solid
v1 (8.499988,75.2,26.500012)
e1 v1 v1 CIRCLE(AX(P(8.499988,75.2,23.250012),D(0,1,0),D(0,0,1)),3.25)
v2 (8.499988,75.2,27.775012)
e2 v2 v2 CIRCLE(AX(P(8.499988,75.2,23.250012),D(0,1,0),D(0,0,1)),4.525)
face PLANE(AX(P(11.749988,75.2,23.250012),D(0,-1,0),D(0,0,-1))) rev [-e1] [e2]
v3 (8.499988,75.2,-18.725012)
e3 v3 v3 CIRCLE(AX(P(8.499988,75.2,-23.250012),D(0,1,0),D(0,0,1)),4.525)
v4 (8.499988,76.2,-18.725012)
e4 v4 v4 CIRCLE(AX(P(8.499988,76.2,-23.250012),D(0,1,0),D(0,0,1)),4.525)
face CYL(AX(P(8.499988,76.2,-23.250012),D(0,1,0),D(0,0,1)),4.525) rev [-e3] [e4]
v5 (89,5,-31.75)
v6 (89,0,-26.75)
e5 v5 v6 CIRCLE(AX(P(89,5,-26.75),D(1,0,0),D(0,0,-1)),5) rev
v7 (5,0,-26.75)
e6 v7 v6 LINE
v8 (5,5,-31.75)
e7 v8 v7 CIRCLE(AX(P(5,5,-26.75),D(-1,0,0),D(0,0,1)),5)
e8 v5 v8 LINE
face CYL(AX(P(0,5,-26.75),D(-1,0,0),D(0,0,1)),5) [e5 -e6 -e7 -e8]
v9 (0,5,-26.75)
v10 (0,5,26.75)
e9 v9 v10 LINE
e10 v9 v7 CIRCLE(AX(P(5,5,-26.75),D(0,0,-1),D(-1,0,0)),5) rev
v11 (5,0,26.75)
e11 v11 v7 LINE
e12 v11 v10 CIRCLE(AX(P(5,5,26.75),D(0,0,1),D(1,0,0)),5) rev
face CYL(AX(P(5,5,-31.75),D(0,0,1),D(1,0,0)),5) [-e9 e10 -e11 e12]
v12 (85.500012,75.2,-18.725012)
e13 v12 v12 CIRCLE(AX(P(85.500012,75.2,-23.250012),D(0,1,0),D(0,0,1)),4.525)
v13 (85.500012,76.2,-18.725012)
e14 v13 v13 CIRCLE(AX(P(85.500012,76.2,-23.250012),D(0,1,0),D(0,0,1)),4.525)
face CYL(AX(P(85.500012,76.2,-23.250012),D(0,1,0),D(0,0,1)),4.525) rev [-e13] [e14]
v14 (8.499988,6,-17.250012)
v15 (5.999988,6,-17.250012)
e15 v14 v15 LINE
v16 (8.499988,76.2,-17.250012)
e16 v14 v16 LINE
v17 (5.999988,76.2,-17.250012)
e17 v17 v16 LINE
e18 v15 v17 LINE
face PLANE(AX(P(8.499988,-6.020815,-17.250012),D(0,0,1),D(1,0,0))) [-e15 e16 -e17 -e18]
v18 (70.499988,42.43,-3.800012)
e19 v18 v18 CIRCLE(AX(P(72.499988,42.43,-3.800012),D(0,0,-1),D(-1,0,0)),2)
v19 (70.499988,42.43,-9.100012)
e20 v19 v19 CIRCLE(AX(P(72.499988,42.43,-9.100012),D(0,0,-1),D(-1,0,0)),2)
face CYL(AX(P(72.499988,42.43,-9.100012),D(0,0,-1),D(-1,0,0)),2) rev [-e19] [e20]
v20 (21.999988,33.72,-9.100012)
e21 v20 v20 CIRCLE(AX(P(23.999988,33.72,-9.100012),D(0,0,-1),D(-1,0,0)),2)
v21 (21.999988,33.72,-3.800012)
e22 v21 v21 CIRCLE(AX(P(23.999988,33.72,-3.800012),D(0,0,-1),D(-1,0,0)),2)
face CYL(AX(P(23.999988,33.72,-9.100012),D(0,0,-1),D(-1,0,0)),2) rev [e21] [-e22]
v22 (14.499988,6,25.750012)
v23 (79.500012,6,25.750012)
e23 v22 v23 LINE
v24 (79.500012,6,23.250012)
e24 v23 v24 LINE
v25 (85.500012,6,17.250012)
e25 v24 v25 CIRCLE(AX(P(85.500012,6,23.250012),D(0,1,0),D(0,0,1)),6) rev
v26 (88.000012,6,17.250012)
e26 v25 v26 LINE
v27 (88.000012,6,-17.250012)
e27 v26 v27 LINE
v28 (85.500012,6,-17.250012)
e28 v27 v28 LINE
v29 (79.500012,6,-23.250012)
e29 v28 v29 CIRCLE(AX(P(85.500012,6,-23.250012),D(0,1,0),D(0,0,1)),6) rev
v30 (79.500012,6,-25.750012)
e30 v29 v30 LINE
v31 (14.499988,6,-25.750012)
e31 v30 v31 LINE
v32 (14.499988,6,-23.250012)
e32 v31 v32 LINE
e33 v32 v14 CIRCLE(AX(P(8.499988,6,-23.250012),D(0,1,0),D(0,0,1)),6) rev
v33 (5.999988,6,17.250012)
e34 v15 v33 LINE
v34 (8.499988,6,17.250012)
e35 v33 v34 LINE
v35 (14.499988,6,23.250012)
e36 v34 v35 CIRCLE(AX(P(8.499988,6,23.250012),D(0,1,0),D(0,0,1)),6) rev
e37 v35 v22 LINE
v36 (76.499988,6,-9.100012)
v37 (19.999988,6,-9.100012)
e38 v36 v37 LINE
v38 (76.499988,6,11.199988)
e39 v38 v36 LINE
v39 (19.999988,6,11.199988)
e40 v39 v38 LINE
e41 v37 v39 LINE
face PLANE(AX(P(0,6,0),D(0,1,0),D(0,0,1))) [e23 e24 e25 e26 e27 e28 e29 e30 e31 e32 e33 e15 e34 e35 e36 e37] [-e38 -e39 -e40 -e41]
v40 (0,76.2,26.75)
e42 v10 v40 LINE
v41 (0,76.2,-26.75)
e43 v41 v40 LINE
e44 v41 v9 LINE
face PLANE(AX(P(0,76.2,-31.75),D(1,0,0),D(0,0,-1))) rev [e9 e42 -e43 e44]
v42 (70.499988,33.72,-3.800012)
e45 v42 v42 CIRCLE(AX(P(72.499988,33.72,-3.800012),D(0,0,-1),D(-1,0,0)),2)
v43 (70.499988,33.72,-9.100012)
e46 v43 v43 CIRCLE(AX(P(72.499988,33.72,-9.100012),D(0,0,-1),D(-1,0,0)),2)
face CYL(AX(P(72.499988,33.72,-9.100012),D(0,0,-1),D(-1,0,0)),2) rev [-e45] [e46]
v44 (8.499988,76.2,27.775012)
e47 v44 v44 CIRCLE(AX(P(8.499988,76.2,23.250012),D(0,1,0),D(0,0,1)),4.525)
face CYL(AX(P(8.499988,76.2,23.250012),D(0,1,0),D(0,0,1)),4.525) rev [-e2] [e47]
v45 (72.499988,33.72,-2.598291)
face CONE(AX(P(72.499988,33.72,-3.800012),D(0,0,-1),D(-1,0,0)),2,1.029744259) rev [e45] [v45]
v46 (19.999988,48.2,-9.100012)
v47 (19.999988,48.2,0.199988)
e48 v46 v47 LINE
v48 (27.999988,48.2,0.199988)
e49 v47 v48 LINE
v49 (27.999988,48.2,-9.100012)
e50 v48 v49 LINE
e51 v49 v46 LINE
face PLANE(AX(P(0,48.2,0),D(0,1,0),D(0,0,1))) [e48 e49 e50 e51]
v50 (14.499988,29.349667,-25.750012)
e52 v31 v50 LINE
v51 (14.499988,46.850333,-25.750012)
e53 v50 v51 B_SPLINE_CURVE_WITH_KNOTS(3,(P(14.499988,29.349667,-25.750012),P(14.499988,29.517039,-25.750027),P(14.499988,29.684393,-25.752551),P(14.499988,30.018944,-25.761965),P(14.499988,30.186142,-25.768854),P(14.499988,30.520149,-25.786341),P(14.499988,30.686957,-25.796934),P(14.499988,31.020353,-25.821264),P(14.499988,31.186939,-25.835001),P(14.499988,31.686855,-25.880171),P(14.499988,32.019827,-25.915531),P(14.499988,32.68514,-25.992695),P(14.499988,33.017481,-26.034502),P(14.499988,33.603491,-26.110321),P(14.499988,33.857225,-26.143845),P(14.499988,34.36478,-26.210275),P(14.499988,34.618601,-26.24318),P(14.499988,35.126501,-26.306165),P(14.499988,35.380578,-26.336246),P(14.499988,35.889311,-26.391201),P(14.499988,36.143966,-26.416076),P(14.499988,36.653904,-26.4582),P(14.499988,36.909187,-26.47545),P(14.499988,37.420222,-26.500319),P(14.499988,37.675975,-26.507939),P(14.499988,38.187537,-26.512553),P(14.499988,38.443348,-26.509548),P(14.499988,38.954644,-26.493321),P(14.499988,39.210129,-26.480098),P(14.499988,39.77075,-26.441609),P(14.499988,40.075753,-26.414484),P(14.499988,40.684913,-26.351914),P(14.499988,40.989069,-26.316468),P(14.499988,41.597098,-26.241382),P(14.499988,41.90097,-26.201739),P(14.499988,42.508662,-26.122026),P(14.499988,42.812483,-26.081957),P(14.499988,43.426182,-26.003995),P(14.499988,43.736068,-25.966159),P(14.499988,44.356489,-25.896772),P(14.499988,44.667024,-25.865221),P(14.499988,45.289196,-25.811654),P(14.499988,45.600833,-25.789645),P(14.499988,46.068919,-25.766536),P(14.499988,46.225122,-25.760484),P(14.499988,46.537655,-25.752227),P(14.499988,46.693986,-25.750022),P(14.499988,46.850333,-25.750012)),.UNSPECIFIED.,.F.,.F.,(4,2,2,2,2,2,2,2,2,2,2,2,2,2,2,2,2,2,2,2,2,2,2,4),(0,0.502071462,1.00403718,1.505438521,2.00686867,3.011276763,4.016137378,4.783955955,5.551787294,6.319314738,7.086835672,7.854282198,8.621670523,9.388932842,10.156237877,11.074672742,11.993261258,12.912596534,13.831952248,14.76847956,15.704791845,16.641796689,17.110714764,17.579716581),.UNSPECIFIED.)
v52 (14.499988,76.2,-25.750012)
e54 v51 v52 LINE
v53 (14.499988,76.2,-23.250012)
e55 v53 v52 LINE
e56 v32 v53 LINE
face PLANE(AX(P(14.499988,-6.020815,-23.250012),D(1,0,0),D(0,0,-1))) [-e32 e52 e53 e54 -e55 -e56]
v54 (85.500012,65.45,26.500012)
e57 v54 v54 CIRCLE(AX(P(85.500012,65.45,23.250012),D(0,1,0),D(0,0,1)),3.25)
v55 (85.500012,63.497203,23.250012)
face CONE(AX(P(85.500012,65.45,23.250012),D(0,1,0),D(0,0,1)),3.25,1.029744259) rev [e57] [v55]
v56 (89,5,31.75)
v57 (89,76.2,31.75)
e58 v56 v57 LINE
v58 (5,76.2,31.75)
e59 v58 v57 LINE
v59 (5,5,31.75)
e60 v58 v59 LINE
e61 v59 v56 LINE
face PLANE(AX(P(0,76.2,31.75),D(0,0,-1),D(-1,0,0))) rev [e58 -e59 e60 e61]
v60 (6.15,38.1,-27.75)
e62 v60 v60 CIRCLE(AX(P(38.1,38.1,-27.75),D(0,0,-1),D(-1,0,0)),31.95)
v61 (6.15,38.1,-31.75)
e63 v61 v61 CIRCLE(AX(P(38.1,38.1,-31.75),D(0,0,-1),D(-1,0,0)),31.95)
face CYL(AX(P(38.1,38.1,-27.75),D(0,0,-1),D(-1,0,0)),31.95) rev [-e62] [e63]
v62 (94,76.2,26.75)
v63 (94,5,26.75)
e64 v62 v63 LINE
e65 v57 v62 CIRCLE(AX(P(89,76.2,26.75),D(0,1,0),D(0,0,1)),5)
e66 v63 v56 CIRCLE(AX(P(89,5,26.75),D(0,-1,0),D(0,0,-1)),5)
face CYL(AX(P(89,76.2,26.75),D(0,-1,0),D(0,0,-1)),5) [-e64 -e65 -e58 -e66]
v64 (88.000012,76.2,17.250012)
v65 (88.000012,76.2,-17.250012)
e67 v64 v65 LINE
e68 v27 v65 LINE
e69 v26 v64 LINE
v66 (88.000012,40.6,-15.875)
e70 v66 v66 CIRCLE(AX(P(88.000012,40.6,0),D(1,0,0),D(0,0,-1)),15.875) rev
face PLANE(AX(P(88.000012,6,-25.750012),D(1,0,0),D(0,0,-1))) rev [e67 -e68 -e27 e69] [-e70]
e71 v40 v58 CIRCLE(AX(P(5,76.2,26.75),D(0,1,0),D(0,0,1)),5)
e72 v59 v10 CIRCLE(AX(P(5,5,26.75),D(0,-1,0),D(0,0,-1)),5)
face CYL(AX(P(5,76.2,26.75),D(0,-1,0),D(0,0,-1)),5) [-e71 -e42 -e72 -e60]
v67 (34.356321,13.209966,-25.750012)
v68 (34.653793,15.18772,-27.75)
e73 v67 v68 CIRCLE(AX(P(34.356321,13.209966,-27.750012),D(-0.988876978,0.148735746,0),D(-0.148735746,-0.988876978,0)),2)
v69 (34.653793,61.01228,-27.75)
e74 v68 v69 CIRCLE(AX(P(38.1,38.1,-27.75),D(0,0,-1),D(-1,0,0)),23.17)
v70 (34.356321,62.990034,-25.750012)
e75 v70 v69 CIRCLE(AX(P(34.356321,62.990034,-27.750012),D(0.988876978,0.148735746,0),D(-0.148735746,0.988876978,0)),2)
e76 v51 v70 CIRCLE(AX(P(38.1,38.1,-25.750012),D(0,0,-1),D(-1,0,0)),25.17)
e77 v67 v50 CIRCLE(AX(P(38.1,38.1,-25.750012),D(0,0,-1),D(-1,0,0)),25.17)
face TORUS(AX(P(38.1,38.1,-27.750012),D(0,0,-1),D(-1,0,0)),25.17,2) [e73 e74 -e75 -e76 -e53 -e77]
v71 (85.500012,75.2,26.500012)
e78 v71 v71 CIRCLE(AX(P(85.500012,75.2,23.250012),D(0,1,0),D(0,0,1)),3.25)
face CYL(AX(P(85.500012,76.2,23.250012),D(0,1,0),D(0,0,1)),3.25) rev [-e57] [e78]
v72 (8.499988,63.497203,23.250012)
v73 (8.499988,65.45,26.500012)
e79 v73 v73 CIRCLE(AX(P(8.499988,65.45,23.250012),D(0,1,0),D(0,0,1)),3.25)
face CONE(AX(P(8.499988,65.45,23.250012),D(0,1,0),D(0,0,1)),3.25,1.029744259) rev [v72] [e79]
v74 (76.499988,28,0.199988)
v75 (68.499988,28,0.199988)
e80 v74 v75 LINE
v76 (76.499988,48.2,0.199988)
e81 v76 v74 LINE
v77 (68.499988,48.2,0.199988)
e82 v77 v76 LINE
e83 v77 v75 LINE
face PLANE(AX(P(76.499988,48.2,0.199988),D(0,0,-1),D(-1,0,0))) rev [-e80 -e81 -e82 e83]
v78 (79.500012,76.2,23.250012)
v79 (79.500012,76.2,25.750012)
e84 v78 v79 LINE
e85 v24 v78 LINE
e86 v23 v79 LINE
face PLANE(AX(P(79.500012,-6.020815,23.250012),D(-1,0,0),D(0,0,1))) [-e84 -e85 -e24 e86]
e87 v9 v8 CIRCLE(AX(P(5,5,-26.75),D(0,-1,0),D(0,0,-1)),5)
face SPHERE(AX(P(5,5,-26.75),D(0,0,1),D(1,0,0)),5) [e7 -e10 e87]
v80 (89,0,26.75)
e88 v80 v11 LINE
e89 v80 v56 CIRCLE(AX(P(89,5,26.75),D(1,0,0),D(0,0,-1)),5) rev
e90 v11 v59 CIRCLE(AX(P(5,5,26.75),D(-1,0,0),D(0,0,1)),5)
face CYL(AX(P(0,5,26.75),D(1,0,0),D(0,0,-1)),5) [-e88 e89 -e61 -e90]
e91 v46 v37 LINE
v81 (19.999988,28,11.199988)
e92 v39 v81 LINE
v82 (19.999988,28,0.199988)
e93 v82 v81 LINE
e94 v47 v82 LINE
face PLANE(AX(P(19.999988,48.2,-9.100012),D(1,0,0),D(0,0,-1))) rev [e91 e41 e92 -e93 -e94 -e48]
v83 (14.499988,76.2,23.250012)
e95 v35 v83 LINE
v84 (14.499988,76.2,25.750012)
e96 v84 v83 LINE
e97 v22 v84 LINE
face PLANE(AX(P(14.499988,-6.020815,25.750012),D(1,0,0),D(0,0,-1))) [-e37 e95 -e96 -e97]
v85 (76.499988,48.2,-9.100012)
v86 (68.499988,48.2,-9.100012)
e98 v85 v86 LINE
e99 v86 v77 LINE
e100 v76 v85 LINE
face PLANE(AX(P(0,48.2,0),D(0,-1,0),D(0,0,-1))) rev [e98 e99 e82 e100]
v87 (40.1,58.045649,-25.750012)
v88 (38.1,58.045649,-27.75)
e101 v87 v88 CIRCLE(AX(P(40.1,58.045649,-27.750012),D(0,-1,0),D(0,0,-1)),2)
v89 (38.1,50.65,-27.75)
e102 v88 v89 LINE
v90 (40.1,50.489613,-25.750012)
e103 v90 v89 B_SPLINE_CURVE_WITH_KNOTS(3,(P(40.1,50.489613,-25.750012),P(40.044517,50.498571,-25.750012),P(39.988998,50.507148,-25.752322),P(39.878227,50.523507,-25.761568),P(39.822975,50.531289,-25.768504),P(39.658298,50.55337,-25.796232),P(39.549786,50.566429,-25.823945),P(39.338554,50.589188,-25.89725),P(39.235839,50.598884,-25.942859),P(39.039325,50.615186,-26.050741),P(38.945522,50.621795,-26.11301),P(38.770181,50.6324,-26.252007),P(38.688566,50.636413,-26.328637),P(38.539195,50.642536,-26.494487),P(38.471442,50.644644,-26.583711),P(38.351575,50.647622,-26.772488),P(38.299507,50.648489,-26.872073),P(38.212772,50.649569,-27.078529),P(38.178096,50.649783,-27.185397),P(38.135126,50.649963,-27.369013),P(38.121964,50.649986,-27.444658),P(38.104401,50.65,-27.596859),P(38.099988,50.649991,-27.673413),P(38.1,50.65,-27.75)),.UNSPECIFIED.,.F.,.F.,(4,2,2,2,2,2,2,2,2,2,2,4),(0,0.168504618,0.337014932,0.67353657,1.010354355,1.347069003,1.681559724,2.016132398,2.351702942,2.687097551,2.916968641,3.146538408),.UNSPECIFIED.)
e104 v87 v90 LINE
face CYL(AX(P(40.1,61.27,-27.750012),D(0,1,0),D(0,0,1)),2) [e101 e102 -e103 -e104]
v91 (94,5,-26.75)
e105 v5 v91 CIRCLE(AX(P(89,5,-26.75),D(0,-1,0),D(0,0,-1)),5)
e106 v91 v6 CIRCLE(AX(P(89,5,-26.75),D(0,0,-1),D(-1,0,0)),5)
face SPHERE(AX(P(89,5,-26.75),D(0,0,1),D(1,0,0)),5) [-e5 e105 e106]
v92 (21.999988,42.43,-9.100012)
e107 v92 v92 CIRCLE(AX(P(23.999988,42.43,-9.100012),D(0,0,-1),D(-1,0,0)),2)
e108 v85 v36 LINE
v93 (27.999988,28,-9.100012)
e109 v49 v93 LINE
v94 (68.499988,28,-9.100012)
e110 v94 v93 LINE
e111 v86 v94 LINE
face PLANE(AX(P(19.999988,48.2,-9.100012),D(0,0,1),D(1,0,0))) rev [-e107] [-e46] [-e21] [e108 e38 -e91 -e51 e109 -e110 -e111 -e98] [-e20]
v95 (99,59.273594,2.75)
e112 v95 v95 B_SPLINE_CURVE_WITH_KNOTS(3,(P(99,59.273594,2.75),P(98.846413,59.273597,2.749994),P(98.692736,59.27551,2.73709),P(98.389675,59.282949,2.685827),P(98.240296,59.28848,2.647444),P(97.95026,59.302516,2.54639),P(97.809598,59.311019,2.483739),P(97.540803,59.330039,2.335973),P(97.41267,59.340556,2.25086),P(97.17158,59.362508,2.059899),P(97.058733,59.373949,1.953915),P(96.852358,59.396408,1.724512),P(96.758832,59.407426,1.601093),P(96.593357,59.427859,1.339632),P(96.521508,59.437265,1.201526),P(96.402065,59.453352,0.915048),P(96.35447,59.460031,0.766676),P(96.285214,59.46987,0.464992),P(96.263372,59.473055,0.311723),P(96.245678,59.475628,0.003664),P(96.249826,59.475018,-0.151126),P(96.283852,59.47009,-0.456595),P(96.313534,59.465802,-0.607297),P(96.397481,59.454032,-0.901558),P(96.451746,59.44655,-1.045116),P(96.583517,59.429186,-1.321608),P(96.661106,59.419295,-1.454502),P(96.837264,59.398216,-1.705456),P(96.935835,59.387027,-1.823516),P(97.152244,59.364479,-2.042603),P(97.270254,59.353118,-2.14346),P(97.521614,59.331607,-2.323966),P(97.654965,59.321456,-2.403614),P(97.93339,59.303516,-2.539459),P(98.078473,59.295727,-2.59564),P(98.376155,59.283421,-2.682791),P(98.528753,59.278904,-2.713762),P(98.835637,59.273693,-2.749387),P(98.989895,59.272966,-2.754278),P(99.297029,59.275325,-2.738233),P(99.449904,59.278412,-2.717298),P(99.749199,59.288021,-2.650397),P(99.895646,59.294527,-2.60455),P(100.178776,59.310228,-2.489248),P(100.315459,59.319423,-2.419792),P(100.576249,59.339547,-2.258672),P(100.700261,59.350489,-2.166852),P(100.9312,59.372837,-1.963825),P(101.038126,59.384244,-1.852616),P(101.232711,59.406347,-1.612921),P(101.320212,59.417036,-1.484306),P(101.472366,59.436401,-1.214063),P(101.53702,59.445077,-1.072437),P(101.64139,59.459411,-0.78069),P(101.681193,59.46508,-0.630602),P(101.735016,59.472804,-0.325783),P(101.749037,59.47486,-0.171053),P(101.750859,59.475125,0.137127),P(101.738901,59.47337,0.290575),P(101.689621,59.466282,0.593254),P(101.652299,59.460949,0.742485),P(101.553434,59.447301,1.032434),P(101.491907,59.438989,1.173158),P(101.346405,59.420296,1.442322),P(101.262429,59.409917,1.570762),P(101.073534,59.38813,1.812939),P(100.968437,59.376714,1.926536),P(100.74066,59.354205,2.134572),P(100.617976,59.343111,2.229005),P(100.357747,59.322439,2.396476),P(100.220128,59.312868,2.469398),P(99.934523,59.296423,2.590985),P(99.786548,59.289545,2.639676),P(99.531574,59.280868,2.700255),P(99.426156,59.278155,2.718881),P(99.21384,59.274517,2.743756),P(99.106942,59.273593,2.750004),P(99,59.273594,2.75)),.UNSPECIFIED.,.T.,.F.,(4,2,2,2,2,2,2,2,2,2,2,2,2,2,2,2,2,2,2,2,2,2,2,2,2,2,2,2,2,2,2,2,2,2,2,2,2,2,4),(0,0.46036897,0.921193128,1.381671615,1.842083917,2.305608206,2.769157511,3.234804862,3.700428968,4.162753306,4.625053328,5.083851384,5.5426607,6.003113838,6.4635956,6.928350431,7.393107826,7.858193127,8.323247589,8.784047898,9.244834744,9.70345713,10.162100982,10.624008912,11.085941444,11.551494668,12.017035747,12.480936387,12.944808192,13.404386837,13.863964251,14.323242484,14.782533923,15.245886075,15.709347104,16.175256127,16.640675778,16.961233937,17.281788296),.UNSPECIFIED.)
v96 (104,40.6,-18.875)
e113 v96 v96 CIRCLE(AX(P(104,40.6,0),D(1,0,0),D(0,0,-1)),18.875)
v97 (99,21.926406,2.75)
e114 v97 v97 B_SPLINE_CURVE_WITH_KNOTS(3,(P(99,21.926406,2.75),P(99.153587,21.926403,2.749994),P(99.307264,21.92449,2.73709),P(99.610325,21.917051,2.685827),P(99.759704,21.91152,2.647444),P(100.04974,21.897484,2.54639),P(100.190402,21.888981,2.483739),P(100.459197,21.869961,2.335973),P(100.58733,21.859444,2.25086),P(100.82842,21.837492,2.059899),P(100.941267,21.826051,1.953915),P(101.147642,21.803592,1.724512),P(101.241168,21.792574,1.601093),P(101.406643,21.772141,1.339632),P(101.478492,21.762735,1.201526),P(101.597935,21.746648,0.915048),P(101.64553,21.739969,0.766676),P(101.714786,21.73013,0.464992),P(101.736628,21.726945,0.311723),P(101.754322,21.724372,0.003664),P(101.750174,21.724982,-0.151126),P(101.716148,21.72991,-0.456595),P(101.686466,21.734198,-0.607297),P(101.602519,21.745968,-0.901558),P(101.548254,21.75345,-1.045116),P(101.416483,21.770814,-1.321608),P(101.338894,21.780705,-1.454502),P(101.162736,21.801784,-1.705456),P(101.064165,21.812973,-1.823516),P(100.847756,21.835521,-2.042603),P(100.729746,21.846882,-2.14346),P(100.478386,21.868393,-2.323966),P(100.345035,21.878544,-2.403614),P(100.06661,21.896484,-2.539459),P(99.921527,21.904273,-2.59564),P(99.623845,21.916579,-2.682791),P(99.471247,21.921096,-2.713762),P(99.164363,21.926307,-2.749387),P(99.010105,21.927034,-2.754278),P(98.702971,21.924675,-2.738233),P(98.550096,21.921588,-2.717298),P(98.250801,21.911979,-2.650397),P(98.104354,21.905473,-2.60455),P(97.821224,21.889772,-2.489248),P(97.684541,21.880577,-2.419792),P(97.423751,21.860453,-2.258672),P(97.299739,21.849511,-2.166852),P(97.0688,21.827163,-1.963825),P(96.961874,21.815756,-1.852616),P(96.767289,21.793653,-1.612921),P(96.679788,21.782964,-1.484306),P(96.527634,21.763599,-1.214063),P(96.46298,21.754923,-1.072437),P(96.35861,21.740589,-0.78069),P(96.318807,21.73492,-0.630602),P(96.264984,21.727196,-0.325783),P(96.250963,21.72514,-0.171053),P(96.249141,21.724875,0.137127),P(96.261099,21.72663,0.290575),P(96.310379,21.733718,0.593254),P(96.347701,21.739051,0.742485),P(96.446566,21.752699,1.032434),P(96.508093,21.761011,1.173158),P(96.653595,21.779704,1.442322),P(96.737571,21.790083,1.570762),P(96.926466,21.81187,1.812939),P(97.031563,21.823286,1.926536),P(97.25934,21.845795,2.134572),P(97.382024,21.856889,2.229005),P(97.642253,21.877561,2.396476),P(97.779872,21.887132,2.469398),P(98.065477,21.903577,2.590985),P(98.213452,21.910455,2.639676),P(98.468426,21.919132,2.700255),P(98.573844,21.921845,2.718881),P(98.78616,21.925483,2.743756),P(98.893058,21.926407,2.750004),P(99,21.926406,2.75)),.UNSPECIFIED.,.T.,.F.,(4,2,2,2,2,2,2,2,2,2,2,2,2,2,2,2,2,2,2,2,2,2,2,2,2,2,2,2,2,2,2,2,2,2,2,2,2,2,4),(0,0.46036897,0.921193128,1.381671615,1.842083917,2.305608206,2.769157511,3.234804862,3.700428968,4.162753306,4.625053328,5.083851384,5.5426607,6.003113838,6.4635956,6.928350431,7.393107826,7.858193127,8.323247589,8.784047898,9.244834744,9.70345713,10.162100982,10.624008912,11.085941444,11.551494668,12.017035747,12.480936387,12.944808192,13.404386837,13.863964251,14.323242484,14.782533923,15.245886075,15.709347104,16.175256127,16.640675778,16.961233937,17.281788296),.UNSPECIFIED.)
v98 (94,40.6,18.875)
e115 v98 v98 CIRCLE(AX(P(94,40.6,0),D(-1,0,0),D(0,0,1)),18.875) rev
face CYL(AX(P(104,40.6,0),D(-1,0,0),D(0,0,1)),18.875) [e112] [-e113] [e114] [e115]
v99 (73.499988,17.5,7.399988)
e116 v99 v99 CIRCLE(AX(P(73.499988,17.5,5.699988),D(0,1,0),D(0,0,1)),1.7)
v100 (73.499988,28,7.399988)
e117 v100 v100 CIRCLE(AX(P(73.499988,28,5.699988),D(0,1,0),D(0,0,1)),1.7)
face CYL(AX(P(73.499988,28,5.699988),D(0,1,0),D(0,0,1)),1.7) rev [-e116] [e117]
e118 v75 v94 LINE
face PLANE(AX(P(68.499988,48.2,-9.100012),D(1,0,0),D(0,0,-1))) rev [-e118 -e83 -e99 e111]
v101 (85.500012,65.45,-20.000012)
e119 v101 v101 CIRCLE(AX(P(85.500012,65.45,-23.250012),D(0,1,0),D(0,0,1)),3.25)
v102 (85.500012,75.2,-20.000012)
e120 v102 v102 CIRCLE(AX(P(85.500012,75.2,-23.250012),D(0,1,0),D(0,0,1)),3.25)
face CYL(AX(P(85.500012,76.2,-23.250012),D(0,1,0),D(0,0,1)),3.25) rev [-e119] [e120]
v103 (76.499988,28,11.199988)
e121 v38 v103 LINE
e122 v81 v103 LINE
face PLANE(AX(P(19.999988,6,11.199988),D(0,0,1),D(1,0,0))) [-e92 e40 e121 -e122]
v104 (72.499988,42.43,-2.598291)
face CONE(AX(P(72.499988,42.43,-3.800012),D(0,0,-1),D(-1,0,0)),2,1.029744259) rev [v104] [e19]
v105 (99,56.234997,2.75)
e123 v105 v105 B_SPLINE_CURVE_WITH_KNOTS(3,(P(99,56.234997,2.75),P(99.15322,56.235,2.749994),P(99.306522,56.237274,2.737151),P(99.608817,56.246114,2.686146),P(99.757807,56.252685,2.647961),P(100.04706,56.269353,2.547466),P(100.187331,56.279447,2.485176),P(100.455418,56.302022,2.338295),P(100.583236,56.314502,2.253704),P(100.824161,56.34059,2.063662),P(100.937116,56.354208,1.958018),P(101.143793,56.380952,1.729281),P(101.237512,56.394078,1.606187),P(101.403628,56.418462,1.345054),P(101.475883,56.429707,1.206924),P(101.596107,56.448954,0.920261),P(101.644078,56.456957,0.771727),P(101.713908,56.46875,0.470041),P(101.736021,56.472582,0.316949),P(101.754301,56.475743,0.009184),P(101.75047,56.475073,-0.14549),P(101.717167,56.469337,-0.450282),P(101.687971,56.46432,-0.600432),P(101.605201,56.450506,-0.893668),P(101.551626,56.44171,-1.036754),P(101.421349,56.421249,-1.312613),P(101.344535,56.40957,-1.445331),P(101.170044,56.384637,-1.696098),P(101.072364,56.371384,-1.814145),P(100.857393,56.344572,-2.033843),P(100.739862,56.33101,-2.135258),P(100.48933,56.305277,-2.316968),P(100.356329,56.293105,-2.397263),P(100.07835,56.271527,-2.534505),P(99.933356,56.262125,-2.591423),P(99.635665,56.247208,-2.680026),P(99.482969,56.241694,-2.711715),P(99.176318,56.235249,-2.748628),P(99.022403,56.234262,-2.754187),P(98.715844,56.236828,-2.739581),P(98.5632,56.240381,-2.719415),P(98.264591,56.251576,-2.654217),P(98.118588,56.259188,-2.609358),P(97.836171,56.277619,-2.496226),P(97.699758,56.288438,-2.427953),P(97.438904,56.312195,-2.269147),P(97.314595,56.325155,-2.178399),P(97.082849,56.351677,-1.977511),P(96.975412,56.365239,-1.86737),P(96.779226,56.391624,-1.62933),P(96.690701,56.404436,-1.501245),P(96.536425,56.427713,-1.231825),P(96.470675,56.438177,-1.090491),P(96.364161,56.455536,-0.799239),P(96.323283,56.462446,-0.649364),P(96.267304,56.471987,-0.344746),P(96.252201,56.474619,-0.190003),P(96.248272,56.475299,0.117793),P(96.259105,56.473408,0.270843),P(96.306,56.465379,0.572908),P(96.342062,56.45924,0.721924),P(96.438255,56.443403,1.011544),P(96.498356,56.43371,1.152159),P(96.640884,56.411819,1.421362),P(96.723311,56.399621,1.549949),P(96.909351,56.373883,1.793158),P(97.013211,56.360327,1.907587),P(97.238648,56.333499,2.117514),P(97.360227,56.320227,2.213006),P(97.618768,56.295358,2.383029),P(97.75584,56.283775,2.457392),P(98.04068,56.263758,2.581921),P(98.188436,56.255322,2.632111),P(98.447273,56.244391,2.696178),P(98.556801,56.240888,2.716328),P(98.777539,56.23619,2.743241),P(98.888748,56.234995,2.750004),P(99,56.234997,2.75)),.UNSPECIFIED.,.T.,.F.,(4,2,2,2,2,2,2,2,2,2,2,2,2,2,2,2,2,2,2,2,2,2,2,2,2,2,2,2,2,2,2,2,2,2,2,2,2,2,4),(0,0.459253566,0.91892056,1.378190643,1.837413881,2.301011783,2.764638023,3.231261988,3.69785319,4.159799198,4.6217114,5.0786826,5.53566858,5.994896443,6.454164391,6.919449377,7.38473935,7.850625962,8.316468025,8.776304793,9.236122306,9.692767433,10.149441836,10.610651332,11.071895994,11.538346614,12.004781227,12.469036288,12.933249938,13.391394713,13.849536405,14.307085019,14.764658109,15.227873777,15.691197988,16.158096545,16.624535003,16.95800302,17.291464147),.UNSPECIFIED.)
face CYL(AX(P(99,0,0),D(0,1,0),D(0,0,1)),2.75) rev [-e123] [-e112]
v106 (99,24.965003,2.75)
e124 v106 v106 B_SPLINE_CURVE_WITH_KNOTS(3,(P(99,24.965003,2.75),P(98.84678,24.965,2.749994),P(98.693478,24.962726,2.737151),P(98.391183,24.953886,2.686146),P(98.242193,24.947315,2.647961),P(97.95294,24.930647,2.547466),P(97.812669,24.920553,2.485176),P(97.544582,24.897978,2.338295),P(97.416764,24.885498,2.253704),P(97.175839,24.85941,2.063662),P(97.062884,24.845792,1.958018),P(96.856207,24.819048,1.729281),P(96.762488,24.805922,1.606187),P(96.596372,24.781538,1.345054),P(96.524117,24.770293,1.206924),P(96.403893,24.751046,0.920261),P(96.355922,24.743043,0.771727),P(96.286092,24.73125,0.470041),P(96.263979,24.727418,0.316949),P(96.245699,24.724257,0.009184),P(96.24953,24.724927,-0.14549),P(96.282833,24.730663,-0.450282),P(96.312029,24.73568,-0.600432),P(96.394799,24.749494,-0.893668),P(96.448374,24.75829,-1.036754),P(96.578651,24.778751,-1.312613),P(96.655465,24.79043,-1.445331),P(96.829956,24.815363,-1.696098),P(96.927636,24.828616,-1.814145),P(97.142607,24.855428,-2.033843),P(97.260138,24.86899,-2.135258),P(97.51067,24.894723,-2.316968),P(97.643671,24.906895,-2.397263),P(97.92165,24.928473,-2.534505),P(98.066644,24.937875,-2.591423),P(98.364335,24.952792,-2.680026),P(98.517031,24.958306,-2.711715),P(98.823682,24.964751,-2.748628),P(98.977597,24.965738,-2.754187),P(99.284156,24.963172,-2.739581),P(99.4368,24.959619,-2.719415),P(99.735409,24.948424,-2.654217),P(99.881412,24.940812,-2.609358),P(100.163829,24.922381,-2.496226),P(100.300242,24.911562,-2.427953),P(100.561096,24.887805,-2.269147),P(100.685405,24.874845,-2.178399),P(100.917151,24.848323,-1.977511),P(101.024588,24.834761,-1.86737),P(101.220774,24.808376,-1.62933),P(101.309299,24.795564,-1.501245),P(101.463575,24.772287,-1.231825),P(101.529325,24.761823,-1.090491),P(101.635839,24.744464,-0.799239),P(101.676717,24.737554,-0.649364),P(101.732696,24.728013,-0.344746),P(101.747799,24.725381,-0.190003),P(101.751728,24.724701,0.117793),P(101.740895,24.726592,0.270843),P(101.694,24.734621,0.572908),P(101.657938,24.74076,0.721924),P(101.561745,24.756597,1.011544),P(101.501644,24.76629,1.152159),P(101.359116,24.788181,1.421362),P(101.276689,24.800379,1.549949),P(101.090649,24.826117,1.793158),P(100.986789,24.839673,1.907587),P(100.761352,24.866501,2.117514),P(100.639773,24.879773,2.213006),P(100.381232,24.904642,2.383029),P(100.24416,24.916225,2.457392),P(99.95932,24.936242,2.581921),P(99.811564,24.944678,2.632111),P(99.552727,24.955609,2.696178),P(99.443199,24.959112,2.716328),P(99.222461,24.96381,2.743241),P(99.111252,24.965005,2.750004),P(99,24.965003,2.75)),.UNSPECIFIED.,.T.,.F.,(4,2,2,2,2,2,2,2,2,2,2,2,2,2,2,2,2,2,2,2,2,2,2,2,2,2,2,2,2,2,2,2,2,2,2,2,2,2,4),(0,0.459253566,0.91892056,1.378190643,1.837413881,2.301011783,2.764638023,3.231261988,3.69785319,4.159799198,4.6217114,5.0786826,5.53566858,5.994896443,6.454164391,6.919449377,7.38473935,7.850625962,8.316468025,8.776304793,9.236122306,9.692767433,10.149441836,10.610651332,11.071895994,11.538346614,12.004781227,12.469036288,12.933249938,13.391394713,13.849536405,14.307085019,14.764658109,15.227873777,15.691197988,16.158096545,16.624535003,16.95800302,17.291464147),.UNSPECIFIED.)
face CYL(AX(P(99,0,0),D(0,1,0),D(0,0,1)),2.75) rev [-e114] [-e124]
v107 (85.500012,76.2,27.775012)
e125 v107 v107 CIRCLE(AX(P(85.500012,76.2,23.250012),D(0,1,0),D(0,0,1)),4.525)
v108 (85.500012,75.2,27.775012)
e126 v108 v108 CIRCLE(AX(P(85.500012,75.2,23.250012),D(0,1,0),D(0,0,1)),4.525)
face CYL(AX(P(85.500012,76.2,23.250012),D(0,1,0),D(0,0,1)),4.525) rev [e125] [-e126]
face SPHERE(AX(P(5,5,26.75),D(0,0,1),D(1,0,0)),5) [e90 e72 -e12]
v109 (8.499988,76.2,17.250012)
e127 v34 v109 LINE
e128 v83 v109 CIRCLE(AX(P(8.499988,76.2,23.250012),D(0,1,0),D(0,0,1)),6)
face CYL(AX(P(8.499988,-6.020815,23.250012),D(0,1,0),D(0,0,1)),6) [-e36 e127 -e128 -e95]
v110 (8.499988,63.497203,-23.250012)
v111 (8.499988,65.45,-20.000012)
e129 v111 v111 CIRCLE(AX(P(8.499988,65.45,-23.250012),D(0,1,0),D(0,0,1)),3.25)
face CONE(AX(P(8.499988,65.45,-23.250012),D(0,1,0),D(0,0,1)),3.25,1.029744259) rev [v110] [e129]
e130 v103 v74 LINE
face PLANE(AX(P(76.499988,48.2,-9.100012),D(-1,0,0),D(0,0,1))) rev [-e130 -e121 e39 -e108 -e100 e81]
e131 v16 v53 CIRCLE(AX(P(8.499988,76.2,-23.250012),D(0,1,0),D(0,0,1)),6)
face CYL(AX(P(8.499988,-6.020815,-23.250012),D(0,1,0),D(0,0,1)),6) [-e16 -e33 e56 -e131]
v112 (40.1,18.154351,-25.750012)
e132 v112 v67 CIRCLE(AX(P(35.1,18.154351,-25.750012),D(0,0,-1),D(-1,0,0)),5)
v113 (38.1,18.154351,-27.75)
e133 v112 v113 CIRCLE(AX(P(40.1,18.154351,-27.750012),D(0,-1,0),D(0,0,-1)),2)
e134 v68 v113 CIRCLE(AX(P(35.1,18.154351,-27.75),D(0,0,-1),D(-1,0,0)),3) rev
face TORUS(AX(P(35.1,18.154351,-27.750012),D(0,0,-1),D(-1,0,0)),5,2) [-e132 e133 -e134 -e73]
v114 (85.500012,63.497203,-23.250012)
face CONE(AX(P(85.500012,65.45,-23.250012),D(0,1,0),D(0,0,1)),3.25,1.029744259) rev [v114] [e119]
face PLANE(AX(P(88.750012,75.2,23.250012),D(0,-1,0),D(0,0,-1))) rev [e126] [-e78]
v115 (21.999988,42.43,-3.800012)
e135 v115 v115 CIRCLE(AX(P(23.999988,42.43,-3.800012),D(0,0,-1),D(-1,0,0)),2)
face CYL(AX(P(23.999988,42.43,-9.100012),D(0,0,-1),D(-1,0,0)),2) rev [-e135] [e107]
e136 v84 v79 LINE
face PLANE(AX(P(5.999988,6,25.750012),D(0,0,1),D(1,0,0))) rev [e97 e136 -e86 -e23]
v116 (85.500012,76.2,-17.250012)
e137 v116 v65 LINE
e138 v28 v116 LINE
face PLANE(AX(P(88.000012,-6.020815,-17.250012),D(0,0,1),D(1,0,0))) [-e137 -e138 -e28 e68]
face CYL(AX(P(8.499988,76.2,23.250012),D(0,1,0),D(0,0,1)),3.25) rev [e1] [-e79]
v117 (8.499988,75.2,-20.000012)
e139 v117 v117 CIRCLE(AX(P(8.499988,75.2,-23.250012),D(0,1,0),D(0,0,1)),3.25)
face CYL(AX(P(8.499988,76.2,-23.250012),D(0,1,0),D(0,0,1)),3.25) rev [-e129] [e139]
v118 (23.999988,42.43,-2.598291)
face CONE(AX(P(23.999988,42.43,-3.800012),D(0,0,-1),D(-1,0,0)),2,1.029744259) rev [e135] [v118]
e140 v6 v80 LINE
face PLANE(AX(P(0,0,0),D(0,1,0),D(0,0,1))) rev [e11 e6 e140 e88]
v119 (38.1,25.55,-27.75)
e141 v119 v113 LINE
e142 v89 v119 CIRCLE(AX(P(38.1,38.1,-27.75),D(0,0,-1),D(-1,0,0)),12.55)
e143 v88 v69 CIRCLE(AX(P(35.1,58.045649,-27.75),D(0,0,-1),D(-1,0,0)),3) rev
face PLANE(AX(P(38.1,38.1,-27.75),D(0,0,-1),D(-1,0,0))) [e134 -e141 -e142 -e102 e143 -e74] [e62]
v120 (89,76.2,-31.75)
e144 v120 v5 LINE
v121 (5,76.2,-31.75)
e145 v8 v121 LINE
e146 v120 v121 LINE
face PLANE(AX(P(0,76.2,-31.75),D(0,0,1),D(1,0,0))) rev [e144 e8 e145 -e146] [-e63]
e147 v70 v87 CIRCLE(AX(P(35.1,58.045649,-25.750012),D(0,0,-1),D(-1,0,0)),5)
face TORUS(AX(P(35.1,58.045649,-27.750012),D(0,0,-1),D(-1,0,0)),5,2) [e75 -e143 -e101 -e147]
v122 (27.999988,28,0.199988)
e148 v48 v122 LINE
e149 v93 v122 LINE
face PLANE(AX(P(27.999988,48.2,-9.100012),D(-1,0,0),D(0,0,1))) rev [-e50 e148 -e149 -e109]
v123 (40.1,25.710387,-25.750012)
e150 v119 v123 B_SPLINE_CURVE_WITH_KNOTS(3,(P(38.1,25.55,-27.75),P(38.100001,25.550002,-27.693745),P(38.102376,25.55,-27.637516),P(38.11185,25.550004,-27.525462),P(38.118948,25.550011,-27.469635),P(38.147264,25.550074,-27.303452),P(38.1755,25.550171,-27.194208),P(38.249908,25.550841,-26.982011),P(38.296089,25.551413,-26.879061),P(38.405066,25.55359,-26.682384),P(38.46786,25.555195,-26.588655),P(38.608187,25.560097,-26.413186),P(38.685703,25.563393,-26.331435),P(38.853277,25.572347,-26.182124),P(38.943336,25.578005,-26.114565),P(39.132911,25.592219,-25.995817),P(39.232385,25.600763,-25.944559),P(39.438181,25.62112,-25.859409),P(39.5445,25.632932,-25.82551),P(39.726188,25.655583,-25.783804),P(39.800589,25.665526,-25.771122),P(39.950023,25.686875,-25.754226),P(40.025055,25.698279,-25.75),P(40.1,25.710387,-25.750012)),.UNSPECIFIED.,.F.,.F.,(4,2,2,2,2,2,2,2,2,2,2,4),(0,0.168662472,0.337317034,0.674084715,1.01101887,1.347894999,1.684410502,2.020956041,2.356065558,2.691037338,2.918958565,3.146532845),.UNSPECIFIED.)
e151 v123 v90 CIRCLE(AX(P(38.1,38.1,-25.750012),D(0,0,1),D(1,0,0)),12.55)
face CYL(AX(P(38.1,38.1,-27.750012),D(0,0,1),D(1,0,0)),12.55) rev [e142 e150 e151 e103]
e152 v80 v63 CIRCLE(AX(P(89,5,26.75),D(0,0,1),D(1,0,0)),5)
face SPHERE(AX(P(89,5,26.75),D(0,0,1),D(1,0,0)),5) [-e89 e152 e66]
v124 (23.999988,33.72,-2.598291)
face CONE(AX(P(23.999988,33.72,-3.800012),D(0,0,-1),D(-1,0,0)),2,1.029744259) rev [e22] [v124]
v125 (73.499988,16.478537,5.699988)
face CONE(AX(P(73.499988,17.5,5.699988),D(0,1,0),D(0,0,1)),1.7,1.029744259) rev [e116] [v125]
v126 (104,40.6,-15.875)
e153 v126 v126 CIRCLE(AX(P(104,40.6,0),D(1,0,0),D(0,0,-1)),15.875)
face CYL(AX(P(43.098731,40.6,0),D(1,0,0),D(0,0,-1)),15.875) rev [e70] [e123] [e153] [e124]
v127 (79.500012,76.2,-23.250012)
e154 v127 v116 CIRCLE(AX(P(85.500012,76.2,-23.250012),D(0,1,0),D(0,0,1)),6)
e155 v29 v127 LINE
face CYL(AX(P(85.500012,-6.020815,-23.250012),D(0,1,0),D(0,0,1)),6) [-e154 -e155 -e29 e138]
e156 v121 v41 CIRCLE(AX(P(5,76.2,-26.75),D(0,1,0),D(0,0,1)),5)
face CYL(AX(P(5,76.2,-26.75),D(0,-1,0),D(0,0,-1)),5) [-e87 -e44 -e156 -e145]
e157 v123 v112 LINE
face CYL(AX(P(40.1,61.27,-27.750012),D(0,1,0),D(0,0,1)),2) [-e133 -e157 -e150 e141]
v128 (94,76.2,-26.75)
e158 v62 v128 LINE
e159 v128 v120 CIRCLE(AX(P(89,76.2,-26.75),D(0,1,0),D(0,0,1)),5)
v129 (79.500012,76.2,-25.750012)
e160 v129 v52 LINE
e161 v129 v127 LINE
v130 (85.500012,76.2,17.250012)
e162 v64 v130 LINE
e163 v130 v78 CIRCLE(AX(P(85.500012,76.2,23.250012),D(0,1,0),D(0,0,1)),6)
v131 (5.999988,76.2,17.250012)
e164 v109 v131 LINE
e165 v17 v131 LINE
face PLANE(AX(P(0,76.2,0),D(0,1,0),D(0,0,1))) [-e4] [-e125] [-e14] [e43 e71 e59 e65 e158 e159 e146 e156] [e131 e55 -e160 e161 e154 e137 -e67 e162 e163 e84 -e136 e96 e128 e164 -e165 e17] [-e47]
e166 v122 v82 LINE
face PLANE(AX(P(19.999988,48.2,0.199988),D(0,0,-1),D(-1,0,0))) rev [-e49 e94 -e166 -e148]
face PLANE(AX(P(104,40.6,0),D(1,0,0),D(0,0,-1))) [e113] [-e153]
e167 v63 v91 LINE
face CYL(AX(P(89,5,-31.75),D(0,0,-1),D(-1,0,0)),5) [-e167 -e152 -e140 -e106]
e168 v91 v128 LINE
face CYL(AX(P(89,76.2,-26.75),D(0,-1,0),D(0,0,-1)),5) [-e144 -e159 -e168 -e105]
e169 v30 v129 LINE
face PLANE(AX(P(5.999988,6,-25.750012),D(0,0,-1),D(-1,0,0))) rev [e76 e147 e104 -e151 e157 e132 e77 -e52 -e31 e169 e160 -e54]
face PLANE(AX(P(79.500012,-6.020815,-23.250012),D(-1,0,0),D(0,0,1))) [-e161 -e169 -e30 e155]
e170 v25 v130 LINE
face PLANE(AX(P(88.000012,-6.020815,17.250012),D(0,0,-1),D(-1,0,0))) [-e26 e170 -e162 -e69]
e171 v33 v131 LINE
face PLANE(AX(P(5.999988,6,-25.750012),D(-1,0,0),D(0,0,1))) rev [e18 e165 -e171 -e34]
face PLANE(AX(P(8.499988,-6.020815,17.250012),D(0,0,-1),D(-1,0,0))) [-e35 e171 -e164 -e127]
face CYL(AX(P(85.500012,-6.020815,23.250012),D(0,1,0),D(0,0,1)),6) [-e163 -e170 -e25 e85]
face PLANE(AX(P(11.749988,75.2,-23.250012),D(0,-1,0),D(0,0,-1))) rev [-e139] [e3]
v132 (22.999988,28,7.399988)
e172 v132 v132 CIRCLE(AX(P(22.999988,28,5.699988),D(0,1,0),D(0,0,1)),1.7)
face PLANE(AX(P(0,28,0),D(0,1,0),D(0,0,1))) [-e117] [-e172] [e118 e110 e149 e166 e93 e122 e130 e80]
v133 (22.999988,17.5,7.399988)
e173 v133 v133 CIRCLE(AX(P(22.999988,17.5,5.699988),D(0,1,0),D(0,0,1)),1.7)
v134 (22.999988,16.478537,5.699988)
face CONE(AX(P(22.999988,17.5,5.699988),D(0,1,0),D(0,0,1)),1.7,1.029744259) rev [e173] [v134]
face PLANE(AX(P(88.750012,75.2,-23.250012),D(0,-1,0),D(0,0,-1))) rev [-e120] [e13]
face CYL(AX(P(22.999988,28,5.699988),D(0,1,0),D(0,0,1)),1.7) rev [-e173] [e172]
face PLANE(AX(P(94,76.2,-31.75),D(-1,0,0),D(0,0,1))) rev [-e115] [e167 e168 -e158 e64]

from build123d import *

# Parameters (mm, degrees)
SKETCH1_W                               = 94
SKETCH1_H                               = 63.5
BOSS_EXTRUDE1_DEPTH                     = 76.2
SKETCH2_W                               = 82.000024
SKETCH2_H                               = 51.500024
CUT_EXTRUDE1_DEPTH                      = 70.2
SKETCH7_R                               = 31.95
CUT_EXTRUDE4_DEPTH                      = 4
SKETCH8_R                               = 12.55
CUT_EXTRUDE5_DEPTH                      = 2
SKETCH14_W                              = 8
SKETCH14_H                              = 9.3
BOSS_EXTRUDE2_DEPTH                     = 42.2
BOSS_EXTRUDE3_DEPTH                     = 22
F_1_0MM_DOWEL_HOLE1_D                   = 3.4
F_1_0MM_DOWEL_HOLE1_DEPTH               = 10.5
F_1_0MM_DOWEL_HOLE1_TIP                 = 1.021463052
F_1_0MM_DOWEL_HOLE2_D                   = 4
F_1_0MM_DOWEL_HOLE2_DEPTH               = 5.3
F_1_0MM_DOWEL_HOLE2_TIP                 = 1.201721238
FILLET1_R                               = 5
BOSS_EXTRUDE4_DEPTH                     = 70.2
CBORE_FOR_M5_HEX_HEAD_BOLT1_D           = 6.5
CBORE_FOR_M5_HEX_HEAD_BOLT1_DEPTH       = 10.75
CBORE_FOR_M5_HEX_HEAD_BOLT1_CBORE_D     = 9.05
CBORE_FOR_M5_HEX_HEAD_BOLT1_CBORE_DEPTH = 1
CBORE_FOR_M5_HEX_HEAD_BOLT1_TIP         = 1.952797012
SKETCH49_R                              = 15.875
CUT_EXTRUDE7_DEPTH                      = 5.999988
BOSS_EXTRUDE5_START                     = 10
SKETCH51_R                              = 18.875
SKETCH51_R_2                            = 15.875
BOSS_EXTRUDE5_DEPTH                     = 10
SKETCH52_R                              = 2.75
CUT_EXTRUDE8_DEPTH                      = 124.940865436
CUT_EXTRUDE9_DEPTH                      = 1.999988
FILLET2_R                               = 3
FILLET3_R                               = 2


with BuildPart() as part:
    # Sketch1 → Boss-Extrude1 (new body)
    with BuildSketch(Plane(origin=(0, 0, 0), x_dir=(1, 0, 0), z_dir=(0, 1, 0))):
        with Locations((47, 0)):
            Rectangle(SKETCH1_W, SKETCH1_H)
    extrude(amount=BOSS_EXTRUDE1_DEPTH)

    # Sketch2 → Cut-Extrude1 (cut)
    with BuildSketch(Plane(origin=(0, 76.2, 0), x_dir=(1, 0, 0), z_dir=(0, 1, 0))):
        with Locations((47, 0)):
            Rectangle(SKETCH2_W, SKETCH2_H)
    extrude(amount=-CUT_EXTRUDE1_DEPTH, mode=Mode.SUBTRACT)

    # Sketch7 → Cut-Extrude4 (cut)
    with BuildSketch(Plane(origin=(0, 0, -31.75), x_dir=(-1, 0, 0), z_dir=(0, 0, -1))):
        with Locations((-38.1, 38.1)):
            Circle(SKETCH7_R)
    extrude(amount=-CUT_EXTRUDE4_DEPTH, mode=Mode.SUBTRACT)

    # Sketch8 → Cut-Extrude5 (cut)
    with BuildSketch(Plane.XY.offset(-25.750012)):
        with Locations((38.1, 38.1)):
            Circle(SKETCH8_R)
    extrude(amount=-CUT_EXTRUDE5_DEPTH, mode=Mode.SUBTRACT)

    # Sketch14 → Boss-Extrude2 (add)
    with BuildSketch(Plane(origin=(0, 6, 0), x_dir=(1, 0, 0), z_dir=(0, 1, 0))):
        with Locations((23.999988, 4.450012)):
            Rectangle(SKETCH14_W, SKETCH14_H)
        with Locations((72.499988, 4.450012)):
            Rectangle(SKETCH14_W, SKETCH14_H)
    extrude(amount=BOSS_EXTRUDE2_DEPTH)

    # Sketch15 → Boss-Extrude3 (add)
    with BuildSketch(Plane(origin=(0, 28, 0), x_dir=(1, 0, 0), z_dir=(0, 1, 0))):
        Polygon((27.999988, 9.100012), (68.499988, 9.100012), (68.499988, -0.199988), (76.499988, -0.199988), (76.499988, -11.199988), (19.999988, -11.199988), (19.999988, -0.199988), (27.999988, -0.199988), align=None)
    extrude(amount=-BOSS_EXTRUDE3_DEPTH)

    # Ø1.0mm Dowel Hole1
    with Locations(Plane(origin=(0, 28, 0), x_dir=(1, 0, 0), z_dir=(0, 1, 0))):
        with Locations((22.999988, -5.699988), (73.499988, -5.699988)):
            Hole(F_1_0MM_DOWEL_HOLE1_D / 2, depth=F_1_0MM_DOWEL_HOLE1_DEPTH)
            with Locations((0, 0, -(F_1_0MM_DOWEL_HOLE1_DEPTH + F_1_0MM_DOWEL_HOLE1_TIP / 2))):  # 118° drill point
                Cone(0, F_1_0MM_DOWEL_HOLE1_D / 2, F_1_0MM_DOWEL_HOLE1_TIP, mode=Mode.SUBTRACT)

    # Ø1.0mm Dowel Hole2
    with Locations(Plane(origin=(0, 0, -9.100012), x_dir=(-1, 0, 0), z_dir=(0, 0, -1))):
        with Locations((-72.499988, 42.43), (-72.499988, 33.72), (-23.999988, 42.43), (-23.999988, 33.72)):
            Hole(F_1_0MM_DOWEL_HOLE2_D / 2, depth=F_1_0MM_DOWEL_HOLE2_DEPTH)
            with Locations((0, 0, -(F_1_0MM_DOWEL_HOLE2_DEPTH + F_1_0MM_DOWEL_HOLE2_TIP / 2))):  # 118° drill point
                Cone(0, F_1_0MM_DOWEL_HOLE2_D / 2, F_1_0MM_DOWEL_HOLE2_TIP, mode=Mode.SUBTRACT)

    # Fillet1
    fillet1_edges = [part.edges().sort_by_distance(p)[0] for p in [
        (47, 0, -31.75),
        (94, 0, 0),
        (47, 0, 31.75),
        (0, 0, 0),
        (0, 38.1, -31.75),
        (94, 38.1, -31.75),
        (94, 38.1, 31.75),
        (0, 38.1, 31.75),
    ]]
    fillet(fillet1_edges, radius=FILLET1_R)

    # Sketch44 → Boss-Extrude4 (add)
    with BuildSketch(Plane(origin=(0, 76.2, 0), x_dir=(1, 0, 0), z_dir=(0, 1, 0))):
        with BuildLine():
            Line((8.499988, 17.250012), (5.999988, 17.250012))
            Line((5.999988, 17.250012), (5.999988, 25.750012))
            Line((5.999988, 25.750012), (14.499988, 25.750012))
            Line((14.499988, 25.750012), (14.499988, 23.250012))
            ThreePointArc((14.499988, 23.250012), (12.742628687, 19.007371313), (8.499988, 17.250012))
        make_face()
        with BuildLine():
            Line((8.499988, -17.250012), (5.999988, -17.250012))
            Line((5.999988, -17.250012), (5.999988, -25.750012))
            Line((5.999988, -25.750012), (14.499988, -25.750012))
            Line((14.499988, -25.750012), (14.499988, -23.250012))
            ThreePointArc((14.499988, -23.250012), (12.742628687, -19.007371313), (8.499988, -17.250012))
        make_face()
        with BuildLine():
            Line((79.500012, -23.250012), (79.500012, -25.750012))
            Line((79.500012, -25.750012), (88.000012, -25.750012))
            Line((88.000012, -25.750012), (88.000012, -17.250012))
            Line((88.000012, -17.250012), (85.500012, -17.250012))
            ThreePointArc((85.500012, -17.250012), (81.257371313, -19.007371313), (79.500012, -23.250012))
        make_face()
        with BuildLine():
            Line((79.500012, 23.250012), (79.500012, 25.750012))
            Line((79.500012, 25.750012), (88.000012, 25.750012))
            Line((88.000012, 25.750012), (88.000012, 17.250012))
            Line((88.000012, 17.250012), (85.500012, 17.250012))
            ThreePointArc((85.500012, 17.250012), (81.257371313, 19.007371313), (79.500012, 23.250012))
        make_face()
    extrude(amount=-BOSS_EXTRUDE4_DEPTH)

    # CBORE for M5 Hex Head Bolt1
    with Locations(Plane(origin=(0, 76.2, 0), x_dir=(1, 0, 0), z_dir=(0, 1, 0))):
        with Locations((8.499988, 23.250012), (8.499988, -23.250012), (85.500012, -23.250012), (85.500012, 23.250012)):
            CounterBoreHole(CBORE_FOR_M5_HEX_HEAD_BOLT1_D / 2, CBORE_FOR_M5_HEX_HEAD_BOLT1_CBORE_D / 2, CBORE_FOR_M5_HEX_HEAD_BOLT1_CBORE_DEPTH, depth=CBORE_FOR_M5_HEX_HEAD_BOLT1_DEPTH)
            with Locations((0, 0, -(CBORE_FOR_M5_HEX_HEAD_BOLT1_DEPTH + CBORE_FOR_M5_HEX_HEAD_BOLT1_TIP / 2))):  # 118° drill point
                Cone(0, CBORE_FOR_M5_HEX_HEAD_BOLT1_D / 2, CBORE_FOR_M5_HEX_HEAD_BOLT1_TIP, mode=Mode.SUBTRACT)

    # Sketch49 → Cut-Extrude7 (cut)
    with BuildSketch(Plane(origin=(94, 0, 0), x_dir=(0, 0, -1), z_dir=(1, 0, 0))):
        with Locations((0, 40.6)):
            Circle(SKETCH49_R)
    extrude(amount=-CUT_EXTRUDE7_DEPTH, mode=Mode.SUBTRACT)

    # Sketch51 → Boss-Extrude5 (add)
    with BuildSketch(Plane(origin=(94, 0, 0), x_dir=(0, 0, -1), z_dir=(1, 0, 0)).offset(BOSS_EXTRUDE5_START)):
        with Locations(Location((0, 40.6, 0), (0, 0, 180))):
            Circle(SKETCH51_R)
        with Locations((0, 40.6)):
            Circle(SKETCH51_R_2, mode=Mode.SUBTRACT)
    extrude(amount=-BOSS_EXTRUDE5_DEPTH)

    # Sketch52 → Cut-Extrude8 (cut, through all)
    with BuildSketch(Plane(origin=(0, 59.475, 0), x_dir=(-1, 0, 0), z_dir=(0, 1, 0))):
        with Locations(Location((-99, 0, 0), (0, 0, 90))):
            Circle(SKETCH52_R)
    extrude(amount=-CUT_EXTRUDE8_DEPTH, mode=Mode.SUBTRACT)

    # Sketch53 → Cut-Extrude9 (cut)
    with BuildSketch(Plane(origin=(0, 0, -27.75), x_dir=(-1, 0, 0), z_dir=(0, 0, -1))):
        with BuildLine():
            Line((-38.1, 61.27), (-38.1, 14.93))
            ThreePointArc((-38.1, 14.93), (-14.93, 38.1), (-38.1, 61.27))
        make_face()
    extrude(amount=-CUT_EXTRUDE9_DEPTH, mode=Mode.SUBTRACT)

    # Fillet2
    fillet2_edges = [part.edges().sort_by_distance(p)[0] for p in [
        (38.1, 14.93, -26.750006),
        (38.1, 61.27, -26.750006),
    ]]
    fillet(fillet2_edges, radius=FILLET2_R)

    # Fillet3
    # the kernel refuses this fillet: 2 mm, written as the material it takes off along each edge
    with BuildSketch(Plane(origin=(38.1, 58.045648648, -25.750012), x_dir=(0, 0, -1), z_dir=(0, -1, 0)), Plane(origin=(38.1, 30.55, -25.750012), x_dir=(0, 0, -1), z_dir=(0, -1, 0))) as fillet3_piece_1:
        with BuildLine():
            CenterArc((2, 2), FILLET3_R, 180, 89.999656225)
            Line((0, 2), (-0.04, 2))
            Line((-0.04, 2), (-0.04, 0))
            Line((-0.04, 0), (0, -0.04))
            Line((0, -0.04), (1.99998776, -0.04))
            Line((1.99998776, -0.04), (1.999988, 0))
        make_face()
    extrude(amount=12.395648648, mode=Mode.SUBTRACT)
    with BuildSketch(Plane(origin=(35.1, 58.045648648, -25.750012), x_dir=(-0.14873574615765991, 0.988876978099361, 0), z_dir=(-0.988876978099361, -0.14873574615765991, 0))) as fillet3_piece_2:
        with BuildLine():
            CenterArc((5, 2), FILLET3_R, 180.000343775, 89.999656225)
            Line((5, 0), (5, -0.04))
            Line((5, -0.04), (3, -0.04))
            Line((3, -0.04), (2.96, 0))
            Line((2.96, 0), (2.96, 1.99998776))
            Line((2.96, 1.99998776), (3, 1.999988))
        make_face()
    revolve(axis=Axis((35.1, 58.045648648, -25.750012), (0, 0, -1)), revolution_arc=98.553668311, mode=Mode.SUBTRACT)
    with BuildSketch(Plane(origin=(35.1, 18.154351352, -25.750012), x_dir=(1, 0, 0), z_dir=(0, 1, 0))) as fillet3_piece_3:
        with BuildLine():
            CenterArc((5, 2), FILLET3_R, 180.000343775, 89.999656225)
            Line((5, 0), (5, -0.04))
            Line((5, -0.04), (3, -0.04))
            Line((3, -0.04), (2.96, 0))
            Line((2.96, 0), (2.96, 1.99998776))
            Line((2.96, 1.99998776), (3, 1.999988))
        make_face()
    revolve(axis=Axis((35.1, 18.154351352, -25.750012), (0, 0, -1)), revolution_arc=98.553668311, mode=Mode.SUBTRACT)
    with BuildSketch(Plane(origin=(38.1, 38.1, -25.750012), x_dir=(-0.14873574615765983, -0.988876978099361, 0), z_dir=(0.988876978099361, -0.14873574615765983, 0))) as fillet3_piece_4_section:
        with BuildLine():
            CenterArc((25.17, 2), FILLET3_R, 180.000343775, 89.999656225)
            Line((25.17, 0), (25.17, -0.04))
            Line((25.17, -0.04), (23.17, -0.04))
            Line((23.17, -0.04), (23.13, 0))
            Line((23.13, 0), (23.13, 1.99998776))
            Line((23.13, 1.99998776), (23.17, 1.999988))
        make_face()
    fillet3_piece_4 = revolve(axis=Axis((38.1, 38.1, -25.750012), (0, 0, -1)), revolution_arc=162.892663379, mode=Mode.PRIVATE)
    fillet3_piece_4 = split(fillet3_piece_4, bisect_by=Plane(origin=(14.499988, 19.260781235, -27.221962955), z_dir=(1, 0, 0)), keep=Keep.TOP, mode=Mode.PRIVATE)
    add(fillet3_piece_4, mode=Mode.SUBTRACT)


solid = part.part
